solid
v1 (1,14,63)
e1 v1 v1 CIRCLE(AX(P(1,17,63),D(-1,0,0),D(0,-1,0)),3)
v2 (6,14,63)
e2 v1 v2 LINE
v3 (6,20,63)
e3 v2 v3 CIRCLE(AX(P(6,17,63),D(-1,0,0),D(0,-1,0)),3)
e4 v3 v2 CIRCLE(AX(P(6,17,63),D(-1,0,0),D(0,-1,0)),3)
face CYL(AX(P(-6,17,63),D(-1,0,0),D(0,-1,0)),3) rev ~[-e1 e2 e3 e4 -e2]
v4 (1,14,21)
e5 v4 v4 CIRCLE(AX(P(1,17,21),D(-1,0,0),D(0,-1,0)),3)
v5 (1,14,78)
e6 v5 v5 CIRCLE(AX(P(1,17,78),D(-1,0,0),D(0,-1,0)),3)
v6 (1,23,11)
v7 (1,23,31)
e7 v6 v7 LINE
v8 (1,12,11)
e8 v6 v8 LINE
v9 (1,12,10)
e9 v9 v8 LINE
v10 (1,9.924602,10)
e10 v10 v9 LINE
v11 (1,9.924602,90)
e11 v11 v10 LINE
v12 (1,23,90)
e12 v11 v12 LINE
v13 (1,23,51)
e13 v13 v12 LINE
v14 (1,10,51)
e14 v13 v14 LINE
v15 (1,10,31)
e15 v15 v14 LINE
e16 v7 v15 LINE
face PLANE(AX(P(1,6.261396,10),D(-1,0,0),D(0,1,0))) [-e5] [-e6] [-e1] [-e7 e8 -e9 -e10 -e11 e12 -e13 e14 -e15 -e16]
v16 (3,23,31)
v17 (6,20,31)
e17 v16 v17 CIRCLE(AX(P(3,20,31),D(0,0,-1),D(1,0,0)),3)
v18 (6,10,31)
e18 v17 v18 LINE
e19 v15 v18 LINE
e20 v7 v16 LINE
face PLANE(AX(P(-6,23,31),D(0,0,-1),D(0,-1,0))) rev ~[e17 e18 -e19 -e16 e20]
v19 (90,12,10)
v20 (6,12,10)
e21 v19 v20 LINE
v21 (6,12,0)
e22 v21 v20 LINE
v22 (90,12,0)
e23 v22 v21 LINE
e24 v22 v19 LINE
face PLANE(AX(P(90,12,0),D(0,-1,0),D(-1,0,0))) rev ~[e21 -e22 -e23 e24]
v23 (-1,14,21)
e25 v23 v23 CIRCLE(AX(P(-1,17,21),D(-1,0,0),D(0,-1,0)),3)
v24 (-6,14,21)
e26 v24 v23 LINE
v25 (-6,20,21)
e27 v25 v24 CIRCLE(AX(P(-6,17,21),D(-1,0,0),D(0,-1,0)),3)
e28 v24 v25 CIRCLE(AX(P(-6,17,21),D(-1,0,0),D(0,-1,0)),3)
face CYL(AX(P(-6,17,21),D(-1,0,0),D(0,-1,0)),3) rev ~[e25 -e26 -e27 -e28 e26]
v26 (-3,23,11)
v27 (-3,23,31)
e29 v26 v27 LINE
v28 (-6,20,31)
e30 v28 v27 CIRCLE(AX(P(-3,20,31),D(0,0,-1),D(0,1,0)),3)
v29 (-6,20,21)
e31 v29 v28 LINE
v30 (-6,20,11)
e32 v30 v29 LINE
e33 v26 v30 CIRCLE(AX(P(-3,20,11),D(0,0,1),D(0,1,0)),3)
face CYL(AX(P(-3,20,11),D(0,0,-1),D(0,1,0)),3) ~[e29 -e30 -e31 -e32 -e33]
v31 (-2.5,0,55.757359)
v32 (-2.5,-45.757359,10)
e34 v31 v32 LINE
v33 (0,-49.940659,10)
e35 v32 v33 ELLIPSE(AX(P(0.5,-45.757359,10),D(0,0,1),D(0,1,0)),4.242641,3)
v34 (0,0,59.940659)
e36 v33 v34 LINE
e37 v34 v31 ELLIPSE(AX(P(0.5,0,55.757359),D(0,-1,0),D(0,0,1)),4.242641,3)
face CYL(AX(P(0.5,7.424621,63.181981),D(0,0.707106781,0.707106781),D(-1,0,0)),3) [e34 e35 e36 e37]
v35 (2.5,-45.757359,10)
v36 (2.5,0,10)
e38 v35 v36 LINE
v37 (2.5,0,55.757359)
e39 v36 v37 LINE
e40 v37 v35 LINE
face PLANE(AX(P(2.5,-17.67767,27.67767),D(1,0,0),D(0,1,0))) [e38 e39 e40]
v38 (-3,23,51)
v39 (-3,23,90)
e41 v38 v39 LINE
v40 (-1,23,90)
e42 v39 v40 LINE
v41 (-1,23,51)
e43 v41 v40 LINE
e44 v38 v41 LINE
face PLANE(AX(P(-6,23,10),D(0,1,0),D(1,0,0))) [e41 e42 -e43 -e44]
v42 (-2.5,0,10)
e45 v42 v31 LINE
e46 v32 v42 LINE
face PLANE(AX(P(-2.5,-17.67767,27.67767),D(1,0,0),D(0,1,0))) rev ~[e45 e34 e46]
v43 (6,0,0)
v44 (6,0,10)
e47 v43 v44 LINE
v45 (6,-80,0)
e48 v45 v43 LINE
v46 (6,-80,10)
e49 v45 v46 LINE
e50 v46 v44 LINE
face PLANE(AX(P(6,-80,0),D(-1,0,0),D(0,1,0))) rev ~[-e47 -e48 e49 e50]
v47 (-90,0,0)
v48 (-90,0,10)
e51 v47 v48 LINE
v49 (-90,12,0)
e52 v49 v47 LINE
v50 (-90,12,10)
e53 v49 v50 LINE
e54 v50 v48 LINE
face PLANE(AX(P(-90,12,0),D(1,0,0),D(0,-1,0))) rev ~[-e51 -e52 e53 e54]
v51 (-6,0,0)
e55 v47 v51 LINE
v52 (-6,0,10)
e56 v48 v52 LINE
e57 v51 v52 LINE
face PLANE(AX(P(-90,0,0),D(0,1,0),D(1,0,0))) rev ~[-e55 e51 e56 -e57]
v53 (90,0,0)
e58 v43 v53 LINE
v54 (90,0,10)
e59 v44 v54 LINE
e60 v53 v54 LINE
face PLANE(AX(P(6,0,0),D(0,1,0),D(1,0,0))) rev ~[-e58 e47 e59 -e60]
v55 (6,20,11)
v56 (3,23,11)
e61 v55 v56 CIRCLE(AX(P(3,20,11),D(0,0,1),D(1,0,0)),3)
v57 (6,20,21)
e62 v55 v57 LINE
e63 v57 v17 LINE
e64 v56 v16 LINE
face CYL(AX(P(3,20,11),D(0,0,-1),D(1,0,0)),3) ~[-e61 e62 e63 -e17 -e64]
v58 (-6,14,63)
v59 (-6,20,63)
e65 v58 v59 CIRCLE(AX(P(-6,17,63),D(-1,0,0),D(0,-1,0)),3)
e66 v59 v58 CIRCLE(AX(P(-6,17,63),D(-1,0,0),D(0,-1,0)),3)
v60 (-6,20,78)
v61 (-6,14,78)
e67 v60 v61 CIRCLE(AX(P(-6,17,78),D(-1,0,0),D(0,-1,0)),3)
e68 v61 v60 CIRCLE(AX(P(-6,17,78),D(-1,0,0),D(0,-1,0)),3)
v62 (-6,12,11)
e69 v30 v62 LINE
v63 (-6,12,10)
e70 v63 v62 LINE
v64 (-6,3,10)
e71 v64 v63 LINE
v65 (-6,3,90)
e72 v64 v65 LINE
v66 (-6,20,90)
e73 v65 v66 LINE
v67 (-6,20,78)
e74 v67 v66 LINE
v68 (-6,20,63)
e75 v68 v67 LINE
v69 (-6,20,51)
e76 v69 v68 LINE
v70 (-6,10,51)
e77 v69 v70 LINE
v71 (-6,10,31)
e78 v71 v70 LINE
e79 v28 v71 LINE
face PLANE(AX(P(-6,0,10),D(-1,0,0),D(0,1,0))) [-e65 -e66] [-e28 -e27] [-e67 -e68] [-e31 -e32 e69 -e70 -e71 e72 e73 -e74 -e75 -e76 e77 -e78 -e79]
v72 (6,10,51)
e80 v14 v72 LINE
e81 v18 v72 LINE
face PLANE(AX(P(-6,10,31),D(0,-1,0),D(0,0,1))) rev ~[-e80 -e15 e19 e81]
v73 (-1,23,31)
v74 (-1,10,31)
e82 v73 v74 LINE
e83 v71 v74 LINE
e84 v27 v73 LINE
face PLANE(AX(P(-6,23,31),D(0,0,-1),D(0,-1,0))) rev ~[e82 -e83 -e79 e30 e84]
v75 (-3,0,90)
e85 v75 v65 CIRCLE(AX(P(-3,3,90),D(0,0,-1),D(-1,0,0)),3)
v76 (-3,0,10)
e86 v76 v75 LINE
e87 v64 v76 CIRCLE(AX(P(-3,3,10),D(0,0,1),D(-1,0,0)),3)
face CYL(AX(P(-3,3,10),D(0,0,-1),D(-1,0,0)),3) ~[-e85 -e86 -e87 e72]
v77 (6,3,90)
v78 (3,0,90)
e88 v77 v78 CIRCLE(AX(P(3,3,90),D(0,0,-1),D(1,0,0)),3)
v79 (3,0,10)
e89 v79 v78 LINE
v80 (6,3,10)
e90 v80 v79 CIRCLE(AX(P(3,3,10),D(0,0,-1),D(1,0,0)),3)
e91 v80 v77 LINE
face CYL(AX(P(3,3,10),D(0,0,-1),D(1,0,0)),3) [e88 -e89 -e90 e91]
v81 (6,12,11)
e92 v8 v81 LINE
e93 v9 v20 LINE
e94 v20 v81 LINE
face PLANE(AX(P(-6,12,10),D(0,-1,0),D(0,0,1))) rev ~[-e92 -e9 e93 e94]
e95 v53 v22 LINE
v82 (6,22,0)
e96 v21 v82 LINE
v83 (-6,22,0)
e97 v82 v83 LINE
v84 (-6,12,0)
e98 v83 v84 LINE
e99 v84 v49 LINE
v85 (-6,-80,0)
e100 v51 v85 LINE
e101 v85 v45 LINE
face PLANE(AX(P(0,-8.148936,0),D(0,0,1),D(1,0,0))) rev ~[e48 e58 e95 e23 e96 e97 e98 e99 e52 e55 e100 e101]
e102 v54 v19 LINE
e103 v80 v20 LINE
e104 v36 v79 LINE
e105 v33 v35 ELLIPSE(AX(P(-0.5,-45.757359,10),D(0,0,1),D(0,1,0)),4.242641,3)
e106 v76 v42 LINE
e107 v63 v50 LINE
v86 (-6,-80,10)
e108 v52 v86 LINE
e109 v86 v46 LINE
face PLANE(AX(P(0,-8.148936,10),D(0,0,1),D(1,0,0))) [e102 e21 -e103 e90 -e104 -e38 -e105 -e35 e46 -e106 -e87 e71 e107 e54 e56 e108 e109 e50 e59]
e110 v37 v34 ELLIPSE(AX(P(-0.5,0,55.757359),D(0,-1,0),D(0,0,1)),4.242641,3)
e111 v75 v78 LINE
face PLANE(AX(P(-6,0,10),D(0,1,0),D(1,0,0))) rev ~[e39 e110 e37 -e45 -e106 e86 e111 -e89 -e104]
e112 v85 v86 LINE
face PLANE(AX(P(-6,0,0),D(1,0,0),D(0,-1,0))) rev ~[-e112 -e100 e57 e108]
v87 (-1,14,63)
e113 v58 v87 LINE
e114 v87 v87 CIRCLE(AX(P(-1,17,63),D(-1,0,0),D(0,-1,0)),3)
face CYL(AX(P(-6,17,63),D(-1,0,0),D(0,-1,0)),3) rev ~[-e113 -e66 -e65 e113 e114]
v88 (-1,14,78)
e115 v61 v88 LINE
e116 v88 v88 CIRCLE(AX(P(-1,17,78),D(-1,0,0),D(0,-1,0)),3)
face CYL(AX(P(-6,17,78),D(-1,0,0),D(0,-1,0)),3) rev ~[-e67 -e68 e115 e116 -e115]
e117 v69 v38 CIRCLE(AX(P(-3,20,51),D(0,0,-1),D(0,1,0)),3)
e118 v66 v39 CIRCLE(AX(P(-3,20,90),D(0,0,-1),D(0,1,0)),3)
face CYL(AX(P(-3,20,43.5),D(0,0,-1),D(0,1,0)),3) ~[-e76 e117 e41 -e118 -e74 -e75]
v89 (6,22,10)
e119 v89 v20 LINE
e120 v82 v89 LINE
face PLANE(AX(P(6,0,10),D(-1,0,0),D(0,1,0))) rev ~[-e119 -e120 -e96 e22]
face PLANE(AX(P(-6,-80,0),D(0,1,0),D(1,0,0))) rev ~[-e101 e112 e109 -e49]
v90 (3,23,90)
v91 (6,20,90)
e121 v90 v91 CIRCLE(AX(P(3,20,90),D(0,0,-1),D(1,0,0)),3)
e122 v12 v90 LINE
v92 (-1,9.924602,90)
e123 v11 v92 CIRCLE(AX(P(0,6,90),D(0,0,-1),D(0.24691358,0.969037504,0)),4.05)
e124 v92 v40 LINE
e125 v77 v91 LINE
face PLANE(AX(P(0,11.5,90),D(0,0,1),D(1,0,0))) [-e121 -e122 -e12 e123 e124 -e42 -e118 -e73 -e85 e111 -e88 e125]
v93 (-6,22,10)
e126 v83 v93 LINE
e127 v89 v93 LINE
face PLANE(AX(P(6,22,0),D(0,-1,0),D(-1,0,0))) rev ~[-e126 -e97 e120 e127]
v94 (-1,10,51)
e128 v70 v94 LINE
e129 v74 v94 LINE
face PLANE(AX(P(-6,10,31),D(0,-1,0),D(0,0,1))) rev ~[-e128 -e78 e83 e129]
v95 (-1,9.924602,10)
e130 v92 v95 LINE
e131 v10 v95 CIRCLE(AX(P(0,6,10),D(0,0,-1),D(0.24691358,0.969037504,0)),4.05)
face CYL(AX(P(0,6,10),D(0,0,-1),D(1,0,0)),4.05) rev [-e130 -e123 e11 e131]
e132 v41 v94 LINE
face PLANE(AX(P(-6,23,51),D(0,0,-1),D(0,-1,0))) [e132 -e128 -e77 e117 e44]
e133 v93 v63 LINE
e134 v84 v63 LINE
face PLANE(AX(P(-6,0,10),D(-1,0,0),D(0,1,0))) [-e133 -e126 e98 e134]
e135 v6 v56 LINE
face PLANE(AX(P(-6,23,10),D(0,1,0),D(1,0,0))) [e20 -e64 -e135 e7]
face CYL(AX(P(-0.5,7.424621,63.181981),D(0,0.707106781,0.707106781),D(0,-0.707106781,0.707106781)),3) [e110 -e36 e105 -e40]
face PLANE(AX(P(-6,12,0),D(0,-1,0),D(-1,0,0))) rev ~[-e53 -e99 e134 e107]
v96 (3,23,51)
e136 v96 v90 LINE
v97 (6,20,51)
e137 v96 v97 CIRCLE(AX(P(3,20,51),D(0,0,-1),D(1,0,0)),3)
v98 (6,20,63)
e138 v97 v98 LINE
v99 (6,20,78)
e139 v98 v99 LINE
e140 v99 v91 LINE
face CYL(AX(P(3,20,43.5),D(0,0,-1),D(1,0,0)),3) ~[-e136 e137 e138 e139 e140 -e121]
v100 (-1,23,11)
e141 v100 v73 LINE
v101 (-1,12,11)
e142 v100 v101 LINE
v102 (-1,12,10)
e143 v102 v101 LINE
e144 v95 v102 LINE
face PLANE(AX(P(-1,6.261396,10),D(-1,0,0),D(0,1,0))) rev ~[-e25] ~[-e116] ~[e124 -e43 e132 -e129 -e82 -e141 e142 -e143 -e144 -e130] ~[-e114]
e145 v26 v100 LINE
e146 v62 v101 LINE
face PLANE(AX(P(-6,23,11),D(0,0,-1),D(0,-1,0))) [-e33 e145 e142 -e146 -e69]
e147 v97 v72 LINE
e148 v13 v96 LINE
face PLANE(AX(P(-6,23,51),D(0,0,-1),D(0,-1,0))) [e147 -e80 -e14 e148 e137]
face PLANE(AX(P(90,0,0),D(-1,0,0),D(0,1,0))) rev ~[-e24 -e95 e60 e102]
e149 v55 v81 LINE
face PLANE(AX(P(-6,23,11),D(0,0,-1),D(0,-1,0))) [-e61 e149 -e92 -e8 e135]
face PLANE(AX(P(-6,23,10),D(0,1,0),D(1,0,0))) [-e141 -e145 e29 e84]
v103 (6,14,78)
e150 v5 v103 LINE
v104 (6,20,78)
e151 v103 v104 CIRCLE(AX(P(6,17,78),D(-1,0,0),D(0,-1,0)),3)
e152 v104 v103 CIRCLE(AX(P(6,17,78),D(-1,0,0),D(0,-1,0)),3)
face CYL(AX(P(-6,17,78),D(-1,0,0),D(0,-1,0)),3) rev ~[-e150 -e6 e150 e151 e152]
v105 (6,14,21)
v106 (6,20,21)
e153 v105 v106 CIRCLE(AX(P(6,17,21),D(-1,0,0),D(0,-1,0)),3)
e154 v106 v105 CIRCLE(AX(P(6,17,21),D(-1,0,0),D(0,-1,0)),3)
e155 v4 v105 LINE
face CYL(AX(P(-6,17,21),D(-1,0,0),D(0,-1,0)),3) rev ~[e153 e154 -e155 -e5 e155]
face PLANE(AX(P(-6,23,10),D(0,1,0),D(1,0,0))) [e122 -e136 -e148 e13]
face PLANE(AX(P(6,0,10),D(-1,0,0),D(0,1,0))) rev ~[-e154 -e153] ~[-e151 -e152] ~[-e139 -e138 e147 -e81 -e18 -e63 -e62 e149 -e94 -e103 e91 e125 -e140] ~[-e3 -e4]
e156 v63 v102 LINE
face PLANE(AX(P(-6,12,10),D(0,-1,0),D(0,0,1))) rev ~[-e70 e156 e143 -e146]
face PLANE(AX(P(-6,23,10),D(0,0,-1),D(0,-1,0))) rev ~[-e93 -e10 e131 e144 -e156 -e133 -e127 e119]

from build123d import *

# Parameters (mm, degrees)
F1_DEPTH      = 10
F3_W          = 12
F3_H          = 23
F3_R          = 4.05
F4_DEPTH      = 80
F5_W          = 2
F5_H          = 39.0547718853
F6_DEPTH      = 80
F7_W          = 11
F7_H          = 1
F7_W_2        = 13
F7_H_2        = 20
F7_R          = 3
F8_DEPTH      = 25
F10_DEPTH     = 2.5
F11_T1_DEPTH  = 87.5
F11_T3_DEPTH  = 54
F11_T5_DEPTH  = 27.5
F11_T10_DEPTH = 85.7106781187
F11_T16_DEPTH = 85.7106781187


# Not quite as in the source:
# - a fillet or chamfer that OpenCascade refuses, or shapes differently, is made with other operations: its cross-section is extruded or revolved along the edge and cut away or added


with BuildPart() as f1:
    # F0 (on Top) → F1 (new body)
    with BuildSketch(Plane.XY):
        Polygon((6, 22), (0, 22), (-6, 22), (-6, 12), (-90, 12), (-90, 0), (-6, 0), (-6, -80), (6, -80), (6, 0), (90, 0), (90, 12), (6, 12), align=None)
    extrude(amount=F1_DEPTH)

    # F3 (on face) → F4 (join)
    with BuildSketch(Plane.XY.offset(10)):
        with Locations((0, 11.5)):
            Rectangle(F3_W, F3_H)
        with Locations((0, 6)):
            Circle(F3_R, mode=Mode.SUBTRACT)
    extrude(amount=F4_DEPTH)

    # F5 (on face) → F6 (cut, through all)
    with BuildSketch(Plane.XY.offset(10)):
        with Locations((0, 25.7887821645)):
            Rectangle(F5_W, F5_H)
    extrude(amount=F6_DEPTH, mode=Mode.SUBTRACT)

    # F7 (on face) → F8 (cut)
    with BuildSketch(Plane(origin=(-6, 0, 0), x_dir=(0, -1, 0), z_dir=(-1, 0, 0))):
        with Locations((-17.5, 10.5)):
            Rectangle(F7_W, F7_H)
        with Locations((-16.5, 41)):
            Rectangle(F7_W_2, F7_H_2)
        with Locations((-17, 21)):
            Circle(F7_R)
        with Locations((-17, 78)):
            Circle(F7_R)
        with Locations((-17, 63)):
            Circle(F7_R)
    extrude(amount=-F8_DEPTH, mode=Mode.SUBTRACT)

    # F9 (on Right) → F10 (join, symmetric)
    with BuildSketch(Plane.YZ):
        Polygon((0, 10), (0, 60), (-50, 10), align=None)
    extrude(amount=F10_DEPTH, both=True)

    # F11: fillet of radius 3 on 8 edges, made by hand

    # F11_s2 → F11_t1 (cut)
    with BuildSketch(Plane.XY.offset(10)):
        with BuildLine():
            ThreePointArc((-6, 3), (-5.1213203436, 0.8786796564), (-3, 0))
            Line((-3, 0), (-6, 0))
            Line((-6, 0), (-6, 3))
        make_face()
        with BuildLine():
            ThreePointArc((6, 3), (5.1213203436, 0.8786796564), (3, 0))
            Line((3, 0), (6, 0))
            Line((6, 0), (6, 3))
        make_face()
    extrude(amount=F11_T1_DEPTH, mode=Mode.SUBTRACT)

    # F11_s4 → F11_t3 (cut)
    with BuildSketch(Plane.XY.offset(43.5)):
        with BuildLine():
            ThreePointArc((-3, 23), (-5.1213203436, 22.1213203436), (-6, 20))
            Line((-6, 20), (-6, 23))
            Line((-6, 23), (-3, 23))
        make_face()
        with BuildLine():
            ThreePointArc((6, 20), (5.1213203436, 22.1213203436), (3, 23))
            Line((3, 23), (6, 23))
            Line((6, 23), (6, 20))
        make_face()
    extrude(amount=F11_T3_DEPTH, mode=Mode.SUBTRACT)

    # F11_s6 → F11_t5 (cut)
    with BuildSketch(Plane.XY.offset(11)):
        with BuildLine():
            ThreePointArc((6, 20), (5.1213203436, 22.1213203436), (3, 23))
            Line((3, 23), (6, 23))
            Line((6, 23), (6, 20))
        make_face()
        with BuildLine():
            ThreePointArc((-3, 23), (-5.1213203436, 22.1213203436), (-6, 20))
            Line((-6, 20), (-6, 23))
            Line((-6, 23), (-3, 23))
        make_face()
    extrude(amount=F11_T5_DEPTH, mode=Mode.SUBTRACT)


with BuildPart() as f11_tool8:
    # F11_s9 → F11_t10 (new body)
    with BuildSketch(Plane(origin=(0, 35.3033008589, 35.3033008589), x_dir=(1, 0, 0), z_dir=(0, -0.7071067812, -0.7071067812))):
        with BuildLine():
            ThreePointArc((-2.5, 39.4264068712), (-1.6213203436, 41.5477272148), (0.5, 42.4264068712))
            Line((0.5, 42.4264068712), (-2.5, 42.4264068712))
            Line((-2.5, 42.4264068712), (-2.5, 39.4264068712))
        make_face()
    extrude(amount=F11_T10_DEPTH)

    split(bisect_by=Plane.XY.offset(10), keep=Keep.TOP)

    split(bisect_by=Plane.XZ, keep=Keep.TOP)


with BuildPart() as f1_1:
    add(f1.part)

    # F11_t7: cut F11_tool8
    add(f11_tool8.part, mode=Mode.SUBTRACT)


with BuildPart() as f11_tool14:
    # F11_s15 → F11_t16 (new body)
    with BuildSketch(Plane(origin=(0, 35.3033008589, 35.3033008589), x_dir=(1, 0, 0), z_dir=(0, -0.7071067812, -0.7071067812))):
        with BuildLine():
            ThreePointArc((-0.5, 42.4264068712), (1.6213203436, 41.5477272148), (2.5, 39.4264068712))
            Line((2.5, 39.4264068712), (2.5, 42.4264068712))
            Line((2.5, 42.4264068712), (-0.5, 42.4264068712))
        make_face()
    extrude(amount=F11_T16_DEPTH)

    split(bisect_by=Plane.XY.offset(10), keep=Keep.TOP)

    split(bisect_by=Plane.XZ, keep=Keep.TOP)


with BuildPart() as f1_2:
    add(f1_1.part)

    # F11_t13: cut F11_tool14
    add(f11_tool14.part, mode=Mode.SUBTRACT)


solid = f1_2.part
